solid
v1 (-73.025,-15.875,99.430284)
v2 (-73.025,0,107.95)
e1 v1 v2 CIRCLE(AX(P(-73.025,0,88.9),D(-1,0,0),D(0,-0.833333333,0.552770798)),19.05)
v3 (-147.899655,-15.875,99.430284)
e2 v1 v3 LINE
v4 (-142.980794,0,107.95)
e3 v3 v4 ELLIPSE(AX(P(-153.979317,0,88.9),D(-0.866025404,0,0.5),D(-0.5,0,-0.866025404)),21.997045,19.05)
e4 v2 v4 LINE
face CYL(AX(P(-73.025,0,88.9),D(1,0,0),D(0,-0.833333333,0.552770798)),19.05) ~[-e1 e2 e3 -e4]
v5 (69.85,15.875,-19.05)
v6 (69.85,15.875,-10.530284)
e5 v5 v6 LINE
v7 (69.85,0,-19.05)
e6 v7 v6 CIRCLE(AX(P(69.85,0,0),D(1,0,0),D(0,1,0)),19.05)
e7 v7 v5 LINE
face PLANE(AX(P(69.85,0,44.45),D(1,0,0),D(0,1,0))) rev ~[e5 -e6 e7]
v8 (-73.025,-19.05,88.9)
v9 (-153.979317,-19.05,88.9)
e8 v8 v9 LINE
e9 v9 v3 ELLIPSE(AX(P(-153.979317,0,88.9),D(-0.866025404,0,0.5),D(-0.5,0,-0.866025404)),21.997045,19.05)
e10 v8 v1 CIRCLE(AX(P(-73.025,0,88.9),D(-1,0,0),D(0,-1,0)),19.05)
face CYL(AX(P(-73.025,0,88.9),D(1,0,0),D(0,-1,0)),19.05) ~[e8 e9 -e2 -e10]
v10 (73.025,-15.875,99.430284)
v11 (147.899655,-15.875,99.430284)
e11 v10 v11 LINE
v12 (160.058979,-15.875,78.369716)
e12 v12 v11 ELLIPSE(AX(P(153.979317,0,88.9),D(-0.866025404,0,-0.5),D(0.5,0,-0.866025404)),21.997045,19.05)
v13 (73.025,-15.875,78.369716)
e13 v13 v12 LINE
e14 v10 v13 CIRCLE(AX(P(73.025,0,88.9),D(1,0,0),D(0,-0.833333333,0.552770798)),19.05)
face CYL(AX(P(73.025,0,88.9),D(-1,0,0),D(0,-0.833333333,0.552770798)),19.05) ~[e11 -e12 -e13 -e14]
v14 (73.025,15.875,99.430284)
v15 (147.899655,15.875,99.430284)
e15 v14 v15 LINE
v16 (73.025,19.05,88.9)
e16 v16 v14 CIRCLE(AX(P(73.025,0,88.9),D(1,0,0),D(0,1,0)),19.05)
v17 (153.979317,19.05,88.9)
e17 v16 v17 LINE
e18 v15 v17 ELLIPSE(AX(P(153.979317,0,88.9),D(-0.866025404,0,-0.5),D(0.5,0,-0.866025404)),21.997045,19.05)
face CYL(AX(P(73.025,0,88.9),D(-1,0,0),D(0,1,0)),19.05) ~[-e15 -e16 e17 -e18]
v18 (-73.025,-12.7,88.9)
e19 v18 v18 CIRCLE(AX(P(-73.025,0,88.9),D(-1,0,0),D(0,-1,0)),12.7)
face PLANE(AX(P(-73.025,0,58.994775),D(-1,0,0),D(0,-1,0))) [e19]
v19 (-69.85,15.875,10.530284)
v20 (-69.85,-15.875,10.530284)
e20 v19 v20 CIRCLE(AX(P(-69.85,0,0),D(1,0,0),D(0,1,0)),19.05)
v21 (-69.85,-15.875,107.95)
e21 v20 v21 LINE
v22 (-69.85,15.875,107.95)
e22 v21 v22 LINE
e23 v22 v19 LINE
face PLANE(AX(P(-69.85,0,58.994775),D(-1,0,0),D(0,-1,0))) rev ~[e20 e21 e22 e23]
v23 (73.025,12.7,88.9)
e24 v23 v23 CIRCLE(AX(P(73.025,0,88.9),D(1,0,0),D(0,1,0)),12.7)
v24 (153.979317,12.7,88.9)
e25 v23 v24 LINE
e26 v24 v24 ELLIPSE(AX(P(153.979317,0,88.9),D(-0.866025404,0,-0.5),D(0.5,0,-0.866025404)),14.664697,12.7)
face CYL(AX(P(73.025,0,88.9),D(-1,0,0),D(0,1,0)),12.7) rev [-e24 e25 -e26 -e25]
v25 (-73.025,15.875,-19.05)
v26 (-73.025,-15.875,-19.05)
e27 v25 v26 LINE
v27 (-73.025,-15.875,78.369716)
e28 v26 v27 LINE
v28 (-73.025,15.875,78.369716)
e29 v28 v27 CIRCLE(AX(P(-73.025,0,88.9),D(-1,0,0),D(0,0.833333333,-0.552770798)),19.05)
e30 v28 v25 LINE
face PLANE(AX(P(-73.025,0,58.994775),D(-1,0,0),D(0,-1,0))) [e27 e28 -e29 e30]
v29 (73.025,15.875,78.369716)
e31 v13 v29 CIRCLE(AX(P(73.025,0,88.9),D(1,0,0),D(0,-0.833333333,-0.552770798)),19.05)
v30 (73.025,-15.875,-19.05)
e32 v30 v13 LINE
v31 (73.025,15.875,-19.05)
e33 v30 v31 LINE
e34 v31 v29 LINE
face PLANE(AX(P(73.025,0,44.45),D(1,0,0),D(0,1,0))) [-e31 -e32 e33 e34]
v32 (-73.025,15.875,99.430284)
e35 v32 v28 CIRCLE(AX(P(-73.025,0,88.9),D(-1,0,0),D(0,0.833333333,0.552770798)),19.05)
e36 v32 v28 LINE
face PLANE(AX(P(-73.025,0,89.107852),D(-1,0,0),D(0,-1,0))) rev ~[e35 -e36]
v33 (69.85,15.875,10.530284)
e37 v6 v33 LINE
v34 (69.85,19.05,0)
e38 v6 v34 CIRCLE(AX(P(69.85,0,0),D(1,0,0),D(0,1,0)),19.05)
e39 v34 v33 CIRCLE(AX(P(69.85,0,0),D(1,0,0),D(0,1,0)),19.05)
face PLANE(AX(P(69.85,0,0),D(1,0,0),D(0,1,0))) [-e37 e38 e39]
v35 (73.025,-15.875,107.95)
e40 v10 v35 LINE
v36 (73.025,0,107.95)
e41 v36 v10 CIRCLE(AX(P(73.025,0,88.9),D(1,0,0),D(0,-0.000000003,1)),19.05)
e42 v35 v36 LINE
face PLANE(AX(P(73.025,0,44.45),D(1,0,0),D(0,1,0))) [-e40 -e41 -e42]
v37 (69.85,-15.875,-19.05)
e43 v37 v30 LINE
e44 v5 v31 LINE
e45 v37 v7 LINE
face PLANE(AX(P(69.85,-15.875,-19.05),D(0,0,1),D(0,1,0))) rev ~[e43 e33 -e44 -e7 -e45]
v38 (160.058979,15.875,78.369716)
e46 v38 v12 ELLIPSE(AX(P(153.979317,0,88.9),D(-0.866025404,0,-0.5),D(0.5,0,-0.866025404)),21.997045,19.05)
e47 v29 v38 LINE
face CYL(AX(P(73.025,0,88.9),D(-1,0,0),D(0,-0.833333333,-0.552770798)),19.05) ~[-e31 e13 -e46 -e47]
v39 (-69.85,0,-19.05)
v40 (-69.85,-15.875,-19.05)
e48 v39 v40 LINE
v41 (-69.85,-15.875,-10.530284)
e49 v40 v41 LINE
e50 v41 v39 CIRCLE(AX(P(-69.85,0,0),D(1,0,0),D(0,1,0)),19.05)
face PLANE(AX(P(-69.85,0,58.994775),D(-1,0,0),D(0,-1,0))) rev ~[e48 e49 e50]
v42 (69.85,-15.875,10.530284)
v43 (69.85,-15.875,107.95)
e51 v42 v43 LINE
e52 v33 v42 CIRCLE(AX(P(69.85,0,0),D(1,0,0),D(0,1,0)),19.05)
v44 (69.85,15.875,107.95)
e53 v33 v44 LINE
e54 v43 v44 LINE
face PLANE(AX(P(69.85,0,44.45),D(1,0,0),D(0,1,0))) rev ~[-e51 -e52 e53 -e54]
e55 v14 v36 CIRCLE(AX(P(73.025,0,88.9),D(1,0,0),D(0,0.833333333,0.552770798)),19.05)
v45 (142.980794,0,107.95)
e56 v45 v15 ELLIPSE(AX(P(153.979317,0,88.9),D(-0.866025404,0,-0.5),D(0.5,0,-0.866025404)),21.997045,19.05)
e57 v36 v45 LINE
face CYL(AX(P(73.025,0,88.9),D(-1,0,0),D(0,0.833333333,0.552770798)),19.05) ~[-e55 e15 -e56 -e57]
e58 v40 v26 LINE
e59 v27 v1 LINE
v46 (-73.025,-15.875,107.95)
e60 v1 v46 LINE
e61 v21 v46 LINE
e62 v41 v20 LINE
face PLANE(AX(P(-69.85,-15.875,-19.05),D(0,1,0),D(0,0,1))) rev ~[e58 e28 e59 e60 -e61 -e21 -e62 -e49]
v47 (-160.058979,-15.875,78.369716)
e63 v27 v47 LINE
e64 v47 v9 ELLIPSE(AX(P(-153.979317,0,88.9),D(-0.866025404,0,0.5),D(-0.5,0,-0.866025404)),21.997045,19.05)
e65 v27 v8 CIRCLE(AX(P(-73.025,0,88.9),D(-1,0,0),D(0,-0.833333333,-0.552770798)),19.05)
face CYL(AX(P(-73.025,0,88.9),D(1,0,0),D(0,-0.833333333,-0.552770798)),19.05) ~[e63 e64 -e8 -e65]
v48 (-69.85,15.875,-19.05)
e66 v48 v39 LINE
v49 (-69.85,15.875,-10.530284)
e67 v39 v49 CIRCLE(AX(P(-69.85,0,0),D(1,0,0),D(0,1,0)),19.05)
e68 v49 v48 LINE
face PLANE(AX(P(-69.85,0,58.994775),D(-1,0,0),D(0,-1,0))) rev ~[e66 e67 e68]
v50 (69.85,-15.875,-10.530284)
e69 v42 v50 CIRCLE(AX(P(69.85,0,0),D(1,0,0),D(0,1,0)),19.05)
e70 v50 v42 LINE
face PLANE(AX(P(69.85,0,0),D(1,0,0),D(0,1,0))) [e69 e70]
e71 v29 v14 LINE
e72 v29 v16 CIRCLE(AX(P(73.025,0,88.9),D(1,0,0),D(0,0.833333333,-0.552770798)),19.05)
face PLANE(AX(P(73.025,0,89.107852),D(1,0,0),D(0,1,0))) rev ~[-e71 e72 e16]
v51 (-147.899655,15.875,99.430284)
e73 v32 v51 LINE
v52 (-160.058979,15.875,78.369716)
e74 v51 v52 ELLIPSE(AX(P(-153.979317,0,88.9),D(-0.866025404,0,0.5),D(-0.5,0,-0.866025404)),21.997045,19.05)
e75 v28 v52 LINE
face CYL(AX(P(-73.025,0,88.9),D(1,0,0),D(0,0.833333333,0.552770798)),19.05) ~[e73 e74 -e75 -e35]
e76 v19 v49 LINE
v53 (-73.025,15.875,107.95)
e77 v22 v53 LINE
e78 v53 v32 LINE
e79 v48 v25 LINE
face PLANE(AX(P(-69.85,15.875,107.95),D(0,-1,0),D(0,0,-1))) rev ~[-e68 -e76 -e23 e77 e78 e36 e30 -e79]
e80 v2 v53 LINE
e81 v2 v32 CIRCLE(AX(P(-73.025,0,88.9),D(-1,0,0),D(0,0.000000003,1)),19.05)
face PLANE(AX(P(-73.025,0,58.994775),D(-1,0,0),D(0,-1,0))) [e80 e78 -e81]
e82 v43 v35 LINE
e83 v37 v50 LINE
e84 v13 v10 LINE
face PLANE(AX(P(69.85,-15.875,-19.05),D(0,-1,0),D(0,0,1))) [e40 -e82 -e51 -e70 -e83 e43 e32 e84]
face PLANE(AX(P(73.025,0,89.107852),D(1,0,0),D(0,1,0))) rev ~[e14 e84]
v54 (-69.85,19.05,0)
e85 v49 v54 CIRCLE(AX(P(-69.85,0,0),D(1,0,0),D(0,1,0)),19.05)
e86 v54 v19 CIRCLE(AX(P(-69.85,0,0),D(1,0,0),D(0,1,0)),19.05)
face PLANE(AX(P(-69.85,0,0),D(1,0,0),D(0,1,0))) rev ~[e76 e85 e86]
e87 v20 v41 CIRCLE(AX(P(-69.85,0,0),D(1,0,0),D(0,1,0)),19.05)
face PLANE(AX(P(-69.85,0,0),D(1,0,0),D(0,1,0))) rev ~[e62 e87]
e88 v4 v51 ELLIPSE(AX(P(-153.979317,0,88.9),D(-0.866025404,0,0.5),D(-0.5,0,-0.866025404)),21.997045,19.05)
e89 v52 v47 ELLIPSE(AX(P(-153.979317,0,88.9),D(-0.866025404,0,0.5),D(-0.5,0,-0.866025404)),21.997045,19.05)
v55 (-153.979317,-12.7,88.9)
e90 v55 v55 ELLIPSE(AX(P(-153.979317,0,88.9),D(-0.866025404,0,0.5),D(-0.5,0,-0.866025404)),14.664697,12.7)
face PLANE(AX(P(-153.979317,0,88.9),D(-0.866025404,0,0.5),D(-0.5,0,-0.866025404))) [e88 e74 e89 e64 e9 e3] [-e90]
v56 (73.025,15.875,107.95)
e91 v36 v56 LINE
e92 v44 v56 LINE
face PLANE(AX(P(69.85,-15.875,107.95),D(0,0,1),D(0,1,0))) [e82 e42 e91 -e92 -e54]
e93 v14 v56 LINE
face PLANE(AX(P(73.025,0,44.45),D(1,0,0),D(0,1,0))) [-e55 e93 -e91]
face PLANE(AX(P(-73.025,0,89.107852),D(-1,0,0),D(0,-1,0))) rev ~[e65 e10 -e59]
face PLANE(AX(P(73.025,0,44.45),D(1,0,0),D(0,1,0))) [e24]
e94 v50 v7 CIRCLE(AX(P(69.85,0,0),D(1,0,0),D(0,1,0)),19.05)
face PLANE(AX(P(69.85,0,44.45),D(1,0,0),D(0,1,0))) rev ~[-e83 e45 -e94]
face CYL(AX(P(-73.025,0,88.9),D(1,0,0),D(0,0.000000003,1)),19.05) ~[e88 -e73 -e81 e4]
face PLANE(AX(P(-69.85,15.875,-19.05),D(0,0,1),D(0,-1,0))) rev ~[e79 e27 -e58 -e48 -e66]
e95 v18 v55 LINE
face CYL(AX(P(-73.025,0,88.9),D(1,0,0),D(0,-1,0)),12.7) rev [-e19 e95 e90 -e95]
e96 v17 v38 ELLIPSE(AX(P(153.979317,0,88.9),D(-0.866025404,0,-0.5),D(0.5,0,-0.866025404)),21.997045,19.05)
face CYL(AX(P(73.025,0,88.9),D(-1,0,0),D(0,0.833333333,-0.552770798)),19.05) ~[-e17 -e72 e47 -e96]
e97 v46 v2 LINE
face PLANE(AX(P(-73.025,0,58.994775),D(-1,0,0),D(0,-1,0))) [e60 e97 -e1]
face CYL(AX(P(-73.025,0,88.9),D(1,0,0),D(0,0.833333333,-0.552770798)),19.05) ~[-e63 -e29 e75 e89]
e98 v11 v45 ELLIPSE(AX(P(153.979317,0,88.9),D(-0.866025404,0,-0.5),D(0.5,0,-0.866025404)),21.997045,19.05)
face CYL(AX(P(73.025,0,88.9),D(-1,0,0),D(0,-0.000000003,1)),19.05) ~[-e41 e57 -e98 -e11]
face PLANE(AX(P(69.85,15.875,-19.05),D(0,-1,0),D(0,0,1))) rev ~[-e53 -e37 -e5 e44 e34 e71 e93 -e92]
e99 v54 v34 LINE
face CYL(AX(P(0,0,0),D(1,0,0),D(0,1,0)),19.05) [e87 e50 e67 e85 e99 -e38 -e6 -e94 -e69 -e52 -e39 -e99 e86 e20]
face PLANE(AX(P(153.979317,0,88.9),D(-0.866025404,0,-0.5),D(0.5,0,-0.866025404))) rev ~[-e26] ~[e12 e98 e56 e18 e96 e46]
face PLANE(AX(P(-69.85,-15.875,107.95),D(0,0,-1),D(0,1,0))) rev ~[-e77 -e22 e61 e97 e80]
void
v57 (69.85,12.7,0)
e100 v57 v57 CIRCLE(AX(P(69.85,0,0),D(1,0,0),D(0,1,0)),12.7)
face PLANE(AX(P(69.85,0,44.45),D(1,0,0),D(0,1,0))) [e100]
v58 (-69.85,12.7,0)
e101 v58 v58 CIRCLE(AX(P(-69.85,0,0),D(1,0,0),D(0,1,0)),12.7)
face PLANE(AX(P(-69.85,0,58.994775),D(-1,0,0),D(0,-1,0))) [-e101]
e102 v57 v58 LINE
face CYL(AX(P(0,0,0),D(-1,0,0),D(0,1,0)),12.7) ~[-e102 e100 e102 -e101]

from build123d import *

# Parameters (mm, degrees)
F0_R         = 19.05
F0_R_2       = 12.7
F2_DEPTH     = 69.85
F3_W         = 31.75
F3_H         = 127
F4_DEPTH     = 3.175
F5_R         = 12.7
F6_DEPTH     = 101.6
F7_R         = 12.7
F8_DEPTH     = 3.175
F9_R         = 12.7
F10_DEPTH    = 101.6
F6_FACE_R    = 19.05
F6_FACE_R_2  = 12.7
F13_REACH    = 74.5272199335
F10_FACE_R   = 19.05
F10_FACE_R_2 = 12.7
F14_REACH    = 74.5272199335


with BuildPart() as f2:
    # F0 (on Right) → F2 (new body, symmetric)
    with BuildSketch(Plane.YZ):
        Circle(F0_R)
        Circle(F0_R_2, mode=Mode.SUBTRACT)
    extrude(amount=F2_DEPTH, both=True)

    # F3 (on face) → F4 (join)
    with BuildSketch(Plane.YZ.offset(69.85)):
        with Locations((0, 44.45)):
            Rectangle(F3_W, F3_H)
    extrude(amount=F4_DEPTH)

    # F5 (on face) → F6 (join)
    with BuildSketch(Plane.YZ.offset(73.025)):
        with BuildLine():
            Line((15.875, 78.3697162906), (15.875, 99.4302837094))
            ThreePointArc((15.875, 99.4302837094), (9.0083459795, 105.6854759454), (-4.82e-08, 107.95))
            ThreePointArc((-4.82e-08, 107.95), (-9.0083460219, 105.6854759226), (-15.875, 99.4302837094))
            Line((-15.875, 99.4302837094), (-15.875, 78.3697162906))
            ThreePointArc((-15.875, 78.3697162906), (0, 69.85), (15.875, 78.3697162906))
        make_face()
        with Locations((0, 88.9)):
            Circle(F5_R, mode=Mode.SUBTRACT)
        with BuildLine():
            ThreePointArc((-15.875, 99.4302837094), (-19.05, 88.9), (-15.875, 78.3697162906))
            Line((-15.875, 78.3697162906), (-15.875, 99.4302837094))
        make_face()
        with BuildLine():
            ThreePointArc((15.875, 78.3697162906), (18.2389864028, 83.400738686), (19.05, 88.9))
            ThreePointArc((19.05, 88.9), (18.2389864028, 94.399261314), (15.875, 99.4302837094))
            Line((15.875, 99.4302837094), (15.875, 78.3697162906))
        make_face()
    extrude(amount=F6_DEPTH)

    # F7 (on face) → F8 (join)
    with BuildSketch(Plane(origin=(-69.85, 0, 0), x_dir=(0, -1, 0), z_dir=(-1, 0, 0))):
        with BuildLine():
            ThreePointArc((-15.875, 10.5302837094), (0, 19.05), (15.875, 10.5302837094))
            Line((15.875, 10.5302837094), (15.875, 107.95))
            Line((15.875, 107.95), (-15.875, 107.95))
            Line((-15.875, 107.95), (-15.875, 10.5302837094))
        make_face()
        with BuildLine():
            ThreePointArc((-15.875, -10.5302837094), (-9.0083460007, -16.785475934), (0, -19.05))
            ThreePointArc((0, -19.05), (9.0083460007, -16.785475934), (15.875, -10.5302837094))
            Line((15.875, -10.5302837094), (15.875, 10.5302837094))
            ThreePointArc((15.875, 10.5302837094), (0, 19.05), (-15.875, 10.5302837094))
            Line((-15.875, 10.5302837094), (-15.875, -10.5302837094))
        make_face()
        Circle(F7_R, mode=Mode.SUBTRACT)
        Circle(F7_R)
        with BuildLine():
            Line((0, -19.05), (15.875, -19.05))
            Line((15.875, -19.05), (15.875, -10.5302837094))
            ThreePointArc((15.875, -10.5302837094), (9.0083460007, -16.785475934), (0, -19.05))
        make_face()
        with BuildLine():
            Line((-15.875, -19.05), (0, -19.05))
            ThreePointArc((0, -19.05), (-9.0083460007, -16.785475934), (-15.875, -10.5302837094))
            Line((-15.875, -10.5302837094), (-15.875, -19.05))
        make_face()
    extrude(amount=F8_DEPTH)

    # F9 (on face) → F10 (join)
    with BuildSketch(Plane(origin=(-73.025, 0, 0), x_dir=(0, -1, 0), z_dir=(-1, 0, 0))):
        with BuildLine():
            Line((15.875, 78.3697162906), (15.875, 99.4302837094))
            ThreePointArc((15.875, 99.4302837094), (9.0083459795, 105.6854759454), (-4.82e-08, 107.95))
            ThreePointArc((-4.82e-08, 107.95), (-9.0083460219, 105.6854759226), (-15.875, 99.4302837094))
            Line((-15.875, 99.4302837094), (-15.875, 78.3697162906))
            ThreePointArc((-15.875, 78.3697162906), (0, 69.85), (15.875, 78.3697162906))
        make_face()
        with Locations((0, 88.9)):
            Circle(F9_R, mode=Mode.SUBTRACT)
        with BuildLine():
            ThreePointArc((15.875, 78.3697162906), (18.2389864028, 83.400738686), (19.05, 88.9))
            ThreePointArc((19.05, 88.9), (18.2389864028, 94.399261314), (15.875, 99.4302837094))
            Line((15.875, 99.4302837094), (15.875, 78.3697162906))
        make_face()
        with BuildLine():
            ThreePointArc((-15.875, 99.4302837094), (-19.05, 88.9), (-15.875, 78.3697162906))
            Line((-15.875, 78.3697162906), (-15.875, 99.4302837094))
        make_face()
    extrude(amount=F10_DEPTH)

    f13_end = Plane(origin=(153.9793167929, 0, 88.9), x_dir=(0.5, 0, -0.8660254038), z_dir=(-0.8660254038, 0, -0.5))
    # F6_face (on face) → F13 (cut, up to a plane its end follows)
    with BuildSketch(Plane(origin=(174.625, 0, 88.9), x_dir=(0, 1, 0), z_dir=(1, 0, 0))):
        Circle(F6_FACE_R)
        Circle(F6_FACE_R_2, mode=Mode.SUBTRACT)
    f13_long = extrude(amount=-F13_REACH, mode=Mode.PRIVATE)
    add(split(f13_long, bisect_by=f13_end, keep=Keep.BOTTOM, mode=Mode.PRIVATE), mode=Mode.SUBTRACT)

    f14_end = Plane(origin=(-153.9793167929, 0, 88.9), x_dir=(-0.5, 0, -0.8660254038), z_dir=(-0.8660254038, 0, 0.5))
    # F10_face (on face) → F14 (cut, up to a plane its end follows)
    with BuildSketch(Plane(origin=(-174.625, 0, 88.9), x_dir=(0, -1, 0), z_dir=(-1, 0, 0))):
        Circle(F10_FACE_R)
        Circle(F10_FACE_R_2, mode=Mode.SUBTRACT)
    f14_long = extrude(amount=-F14_REACH, mode=Mode.PRIVATE)
    add(split(f14_long, bisect_by=f14_end, keep=Keep.TOP, mode=Mode.PRIVATE), mode=Mode.SUBTRACT)


solid = f2.part
